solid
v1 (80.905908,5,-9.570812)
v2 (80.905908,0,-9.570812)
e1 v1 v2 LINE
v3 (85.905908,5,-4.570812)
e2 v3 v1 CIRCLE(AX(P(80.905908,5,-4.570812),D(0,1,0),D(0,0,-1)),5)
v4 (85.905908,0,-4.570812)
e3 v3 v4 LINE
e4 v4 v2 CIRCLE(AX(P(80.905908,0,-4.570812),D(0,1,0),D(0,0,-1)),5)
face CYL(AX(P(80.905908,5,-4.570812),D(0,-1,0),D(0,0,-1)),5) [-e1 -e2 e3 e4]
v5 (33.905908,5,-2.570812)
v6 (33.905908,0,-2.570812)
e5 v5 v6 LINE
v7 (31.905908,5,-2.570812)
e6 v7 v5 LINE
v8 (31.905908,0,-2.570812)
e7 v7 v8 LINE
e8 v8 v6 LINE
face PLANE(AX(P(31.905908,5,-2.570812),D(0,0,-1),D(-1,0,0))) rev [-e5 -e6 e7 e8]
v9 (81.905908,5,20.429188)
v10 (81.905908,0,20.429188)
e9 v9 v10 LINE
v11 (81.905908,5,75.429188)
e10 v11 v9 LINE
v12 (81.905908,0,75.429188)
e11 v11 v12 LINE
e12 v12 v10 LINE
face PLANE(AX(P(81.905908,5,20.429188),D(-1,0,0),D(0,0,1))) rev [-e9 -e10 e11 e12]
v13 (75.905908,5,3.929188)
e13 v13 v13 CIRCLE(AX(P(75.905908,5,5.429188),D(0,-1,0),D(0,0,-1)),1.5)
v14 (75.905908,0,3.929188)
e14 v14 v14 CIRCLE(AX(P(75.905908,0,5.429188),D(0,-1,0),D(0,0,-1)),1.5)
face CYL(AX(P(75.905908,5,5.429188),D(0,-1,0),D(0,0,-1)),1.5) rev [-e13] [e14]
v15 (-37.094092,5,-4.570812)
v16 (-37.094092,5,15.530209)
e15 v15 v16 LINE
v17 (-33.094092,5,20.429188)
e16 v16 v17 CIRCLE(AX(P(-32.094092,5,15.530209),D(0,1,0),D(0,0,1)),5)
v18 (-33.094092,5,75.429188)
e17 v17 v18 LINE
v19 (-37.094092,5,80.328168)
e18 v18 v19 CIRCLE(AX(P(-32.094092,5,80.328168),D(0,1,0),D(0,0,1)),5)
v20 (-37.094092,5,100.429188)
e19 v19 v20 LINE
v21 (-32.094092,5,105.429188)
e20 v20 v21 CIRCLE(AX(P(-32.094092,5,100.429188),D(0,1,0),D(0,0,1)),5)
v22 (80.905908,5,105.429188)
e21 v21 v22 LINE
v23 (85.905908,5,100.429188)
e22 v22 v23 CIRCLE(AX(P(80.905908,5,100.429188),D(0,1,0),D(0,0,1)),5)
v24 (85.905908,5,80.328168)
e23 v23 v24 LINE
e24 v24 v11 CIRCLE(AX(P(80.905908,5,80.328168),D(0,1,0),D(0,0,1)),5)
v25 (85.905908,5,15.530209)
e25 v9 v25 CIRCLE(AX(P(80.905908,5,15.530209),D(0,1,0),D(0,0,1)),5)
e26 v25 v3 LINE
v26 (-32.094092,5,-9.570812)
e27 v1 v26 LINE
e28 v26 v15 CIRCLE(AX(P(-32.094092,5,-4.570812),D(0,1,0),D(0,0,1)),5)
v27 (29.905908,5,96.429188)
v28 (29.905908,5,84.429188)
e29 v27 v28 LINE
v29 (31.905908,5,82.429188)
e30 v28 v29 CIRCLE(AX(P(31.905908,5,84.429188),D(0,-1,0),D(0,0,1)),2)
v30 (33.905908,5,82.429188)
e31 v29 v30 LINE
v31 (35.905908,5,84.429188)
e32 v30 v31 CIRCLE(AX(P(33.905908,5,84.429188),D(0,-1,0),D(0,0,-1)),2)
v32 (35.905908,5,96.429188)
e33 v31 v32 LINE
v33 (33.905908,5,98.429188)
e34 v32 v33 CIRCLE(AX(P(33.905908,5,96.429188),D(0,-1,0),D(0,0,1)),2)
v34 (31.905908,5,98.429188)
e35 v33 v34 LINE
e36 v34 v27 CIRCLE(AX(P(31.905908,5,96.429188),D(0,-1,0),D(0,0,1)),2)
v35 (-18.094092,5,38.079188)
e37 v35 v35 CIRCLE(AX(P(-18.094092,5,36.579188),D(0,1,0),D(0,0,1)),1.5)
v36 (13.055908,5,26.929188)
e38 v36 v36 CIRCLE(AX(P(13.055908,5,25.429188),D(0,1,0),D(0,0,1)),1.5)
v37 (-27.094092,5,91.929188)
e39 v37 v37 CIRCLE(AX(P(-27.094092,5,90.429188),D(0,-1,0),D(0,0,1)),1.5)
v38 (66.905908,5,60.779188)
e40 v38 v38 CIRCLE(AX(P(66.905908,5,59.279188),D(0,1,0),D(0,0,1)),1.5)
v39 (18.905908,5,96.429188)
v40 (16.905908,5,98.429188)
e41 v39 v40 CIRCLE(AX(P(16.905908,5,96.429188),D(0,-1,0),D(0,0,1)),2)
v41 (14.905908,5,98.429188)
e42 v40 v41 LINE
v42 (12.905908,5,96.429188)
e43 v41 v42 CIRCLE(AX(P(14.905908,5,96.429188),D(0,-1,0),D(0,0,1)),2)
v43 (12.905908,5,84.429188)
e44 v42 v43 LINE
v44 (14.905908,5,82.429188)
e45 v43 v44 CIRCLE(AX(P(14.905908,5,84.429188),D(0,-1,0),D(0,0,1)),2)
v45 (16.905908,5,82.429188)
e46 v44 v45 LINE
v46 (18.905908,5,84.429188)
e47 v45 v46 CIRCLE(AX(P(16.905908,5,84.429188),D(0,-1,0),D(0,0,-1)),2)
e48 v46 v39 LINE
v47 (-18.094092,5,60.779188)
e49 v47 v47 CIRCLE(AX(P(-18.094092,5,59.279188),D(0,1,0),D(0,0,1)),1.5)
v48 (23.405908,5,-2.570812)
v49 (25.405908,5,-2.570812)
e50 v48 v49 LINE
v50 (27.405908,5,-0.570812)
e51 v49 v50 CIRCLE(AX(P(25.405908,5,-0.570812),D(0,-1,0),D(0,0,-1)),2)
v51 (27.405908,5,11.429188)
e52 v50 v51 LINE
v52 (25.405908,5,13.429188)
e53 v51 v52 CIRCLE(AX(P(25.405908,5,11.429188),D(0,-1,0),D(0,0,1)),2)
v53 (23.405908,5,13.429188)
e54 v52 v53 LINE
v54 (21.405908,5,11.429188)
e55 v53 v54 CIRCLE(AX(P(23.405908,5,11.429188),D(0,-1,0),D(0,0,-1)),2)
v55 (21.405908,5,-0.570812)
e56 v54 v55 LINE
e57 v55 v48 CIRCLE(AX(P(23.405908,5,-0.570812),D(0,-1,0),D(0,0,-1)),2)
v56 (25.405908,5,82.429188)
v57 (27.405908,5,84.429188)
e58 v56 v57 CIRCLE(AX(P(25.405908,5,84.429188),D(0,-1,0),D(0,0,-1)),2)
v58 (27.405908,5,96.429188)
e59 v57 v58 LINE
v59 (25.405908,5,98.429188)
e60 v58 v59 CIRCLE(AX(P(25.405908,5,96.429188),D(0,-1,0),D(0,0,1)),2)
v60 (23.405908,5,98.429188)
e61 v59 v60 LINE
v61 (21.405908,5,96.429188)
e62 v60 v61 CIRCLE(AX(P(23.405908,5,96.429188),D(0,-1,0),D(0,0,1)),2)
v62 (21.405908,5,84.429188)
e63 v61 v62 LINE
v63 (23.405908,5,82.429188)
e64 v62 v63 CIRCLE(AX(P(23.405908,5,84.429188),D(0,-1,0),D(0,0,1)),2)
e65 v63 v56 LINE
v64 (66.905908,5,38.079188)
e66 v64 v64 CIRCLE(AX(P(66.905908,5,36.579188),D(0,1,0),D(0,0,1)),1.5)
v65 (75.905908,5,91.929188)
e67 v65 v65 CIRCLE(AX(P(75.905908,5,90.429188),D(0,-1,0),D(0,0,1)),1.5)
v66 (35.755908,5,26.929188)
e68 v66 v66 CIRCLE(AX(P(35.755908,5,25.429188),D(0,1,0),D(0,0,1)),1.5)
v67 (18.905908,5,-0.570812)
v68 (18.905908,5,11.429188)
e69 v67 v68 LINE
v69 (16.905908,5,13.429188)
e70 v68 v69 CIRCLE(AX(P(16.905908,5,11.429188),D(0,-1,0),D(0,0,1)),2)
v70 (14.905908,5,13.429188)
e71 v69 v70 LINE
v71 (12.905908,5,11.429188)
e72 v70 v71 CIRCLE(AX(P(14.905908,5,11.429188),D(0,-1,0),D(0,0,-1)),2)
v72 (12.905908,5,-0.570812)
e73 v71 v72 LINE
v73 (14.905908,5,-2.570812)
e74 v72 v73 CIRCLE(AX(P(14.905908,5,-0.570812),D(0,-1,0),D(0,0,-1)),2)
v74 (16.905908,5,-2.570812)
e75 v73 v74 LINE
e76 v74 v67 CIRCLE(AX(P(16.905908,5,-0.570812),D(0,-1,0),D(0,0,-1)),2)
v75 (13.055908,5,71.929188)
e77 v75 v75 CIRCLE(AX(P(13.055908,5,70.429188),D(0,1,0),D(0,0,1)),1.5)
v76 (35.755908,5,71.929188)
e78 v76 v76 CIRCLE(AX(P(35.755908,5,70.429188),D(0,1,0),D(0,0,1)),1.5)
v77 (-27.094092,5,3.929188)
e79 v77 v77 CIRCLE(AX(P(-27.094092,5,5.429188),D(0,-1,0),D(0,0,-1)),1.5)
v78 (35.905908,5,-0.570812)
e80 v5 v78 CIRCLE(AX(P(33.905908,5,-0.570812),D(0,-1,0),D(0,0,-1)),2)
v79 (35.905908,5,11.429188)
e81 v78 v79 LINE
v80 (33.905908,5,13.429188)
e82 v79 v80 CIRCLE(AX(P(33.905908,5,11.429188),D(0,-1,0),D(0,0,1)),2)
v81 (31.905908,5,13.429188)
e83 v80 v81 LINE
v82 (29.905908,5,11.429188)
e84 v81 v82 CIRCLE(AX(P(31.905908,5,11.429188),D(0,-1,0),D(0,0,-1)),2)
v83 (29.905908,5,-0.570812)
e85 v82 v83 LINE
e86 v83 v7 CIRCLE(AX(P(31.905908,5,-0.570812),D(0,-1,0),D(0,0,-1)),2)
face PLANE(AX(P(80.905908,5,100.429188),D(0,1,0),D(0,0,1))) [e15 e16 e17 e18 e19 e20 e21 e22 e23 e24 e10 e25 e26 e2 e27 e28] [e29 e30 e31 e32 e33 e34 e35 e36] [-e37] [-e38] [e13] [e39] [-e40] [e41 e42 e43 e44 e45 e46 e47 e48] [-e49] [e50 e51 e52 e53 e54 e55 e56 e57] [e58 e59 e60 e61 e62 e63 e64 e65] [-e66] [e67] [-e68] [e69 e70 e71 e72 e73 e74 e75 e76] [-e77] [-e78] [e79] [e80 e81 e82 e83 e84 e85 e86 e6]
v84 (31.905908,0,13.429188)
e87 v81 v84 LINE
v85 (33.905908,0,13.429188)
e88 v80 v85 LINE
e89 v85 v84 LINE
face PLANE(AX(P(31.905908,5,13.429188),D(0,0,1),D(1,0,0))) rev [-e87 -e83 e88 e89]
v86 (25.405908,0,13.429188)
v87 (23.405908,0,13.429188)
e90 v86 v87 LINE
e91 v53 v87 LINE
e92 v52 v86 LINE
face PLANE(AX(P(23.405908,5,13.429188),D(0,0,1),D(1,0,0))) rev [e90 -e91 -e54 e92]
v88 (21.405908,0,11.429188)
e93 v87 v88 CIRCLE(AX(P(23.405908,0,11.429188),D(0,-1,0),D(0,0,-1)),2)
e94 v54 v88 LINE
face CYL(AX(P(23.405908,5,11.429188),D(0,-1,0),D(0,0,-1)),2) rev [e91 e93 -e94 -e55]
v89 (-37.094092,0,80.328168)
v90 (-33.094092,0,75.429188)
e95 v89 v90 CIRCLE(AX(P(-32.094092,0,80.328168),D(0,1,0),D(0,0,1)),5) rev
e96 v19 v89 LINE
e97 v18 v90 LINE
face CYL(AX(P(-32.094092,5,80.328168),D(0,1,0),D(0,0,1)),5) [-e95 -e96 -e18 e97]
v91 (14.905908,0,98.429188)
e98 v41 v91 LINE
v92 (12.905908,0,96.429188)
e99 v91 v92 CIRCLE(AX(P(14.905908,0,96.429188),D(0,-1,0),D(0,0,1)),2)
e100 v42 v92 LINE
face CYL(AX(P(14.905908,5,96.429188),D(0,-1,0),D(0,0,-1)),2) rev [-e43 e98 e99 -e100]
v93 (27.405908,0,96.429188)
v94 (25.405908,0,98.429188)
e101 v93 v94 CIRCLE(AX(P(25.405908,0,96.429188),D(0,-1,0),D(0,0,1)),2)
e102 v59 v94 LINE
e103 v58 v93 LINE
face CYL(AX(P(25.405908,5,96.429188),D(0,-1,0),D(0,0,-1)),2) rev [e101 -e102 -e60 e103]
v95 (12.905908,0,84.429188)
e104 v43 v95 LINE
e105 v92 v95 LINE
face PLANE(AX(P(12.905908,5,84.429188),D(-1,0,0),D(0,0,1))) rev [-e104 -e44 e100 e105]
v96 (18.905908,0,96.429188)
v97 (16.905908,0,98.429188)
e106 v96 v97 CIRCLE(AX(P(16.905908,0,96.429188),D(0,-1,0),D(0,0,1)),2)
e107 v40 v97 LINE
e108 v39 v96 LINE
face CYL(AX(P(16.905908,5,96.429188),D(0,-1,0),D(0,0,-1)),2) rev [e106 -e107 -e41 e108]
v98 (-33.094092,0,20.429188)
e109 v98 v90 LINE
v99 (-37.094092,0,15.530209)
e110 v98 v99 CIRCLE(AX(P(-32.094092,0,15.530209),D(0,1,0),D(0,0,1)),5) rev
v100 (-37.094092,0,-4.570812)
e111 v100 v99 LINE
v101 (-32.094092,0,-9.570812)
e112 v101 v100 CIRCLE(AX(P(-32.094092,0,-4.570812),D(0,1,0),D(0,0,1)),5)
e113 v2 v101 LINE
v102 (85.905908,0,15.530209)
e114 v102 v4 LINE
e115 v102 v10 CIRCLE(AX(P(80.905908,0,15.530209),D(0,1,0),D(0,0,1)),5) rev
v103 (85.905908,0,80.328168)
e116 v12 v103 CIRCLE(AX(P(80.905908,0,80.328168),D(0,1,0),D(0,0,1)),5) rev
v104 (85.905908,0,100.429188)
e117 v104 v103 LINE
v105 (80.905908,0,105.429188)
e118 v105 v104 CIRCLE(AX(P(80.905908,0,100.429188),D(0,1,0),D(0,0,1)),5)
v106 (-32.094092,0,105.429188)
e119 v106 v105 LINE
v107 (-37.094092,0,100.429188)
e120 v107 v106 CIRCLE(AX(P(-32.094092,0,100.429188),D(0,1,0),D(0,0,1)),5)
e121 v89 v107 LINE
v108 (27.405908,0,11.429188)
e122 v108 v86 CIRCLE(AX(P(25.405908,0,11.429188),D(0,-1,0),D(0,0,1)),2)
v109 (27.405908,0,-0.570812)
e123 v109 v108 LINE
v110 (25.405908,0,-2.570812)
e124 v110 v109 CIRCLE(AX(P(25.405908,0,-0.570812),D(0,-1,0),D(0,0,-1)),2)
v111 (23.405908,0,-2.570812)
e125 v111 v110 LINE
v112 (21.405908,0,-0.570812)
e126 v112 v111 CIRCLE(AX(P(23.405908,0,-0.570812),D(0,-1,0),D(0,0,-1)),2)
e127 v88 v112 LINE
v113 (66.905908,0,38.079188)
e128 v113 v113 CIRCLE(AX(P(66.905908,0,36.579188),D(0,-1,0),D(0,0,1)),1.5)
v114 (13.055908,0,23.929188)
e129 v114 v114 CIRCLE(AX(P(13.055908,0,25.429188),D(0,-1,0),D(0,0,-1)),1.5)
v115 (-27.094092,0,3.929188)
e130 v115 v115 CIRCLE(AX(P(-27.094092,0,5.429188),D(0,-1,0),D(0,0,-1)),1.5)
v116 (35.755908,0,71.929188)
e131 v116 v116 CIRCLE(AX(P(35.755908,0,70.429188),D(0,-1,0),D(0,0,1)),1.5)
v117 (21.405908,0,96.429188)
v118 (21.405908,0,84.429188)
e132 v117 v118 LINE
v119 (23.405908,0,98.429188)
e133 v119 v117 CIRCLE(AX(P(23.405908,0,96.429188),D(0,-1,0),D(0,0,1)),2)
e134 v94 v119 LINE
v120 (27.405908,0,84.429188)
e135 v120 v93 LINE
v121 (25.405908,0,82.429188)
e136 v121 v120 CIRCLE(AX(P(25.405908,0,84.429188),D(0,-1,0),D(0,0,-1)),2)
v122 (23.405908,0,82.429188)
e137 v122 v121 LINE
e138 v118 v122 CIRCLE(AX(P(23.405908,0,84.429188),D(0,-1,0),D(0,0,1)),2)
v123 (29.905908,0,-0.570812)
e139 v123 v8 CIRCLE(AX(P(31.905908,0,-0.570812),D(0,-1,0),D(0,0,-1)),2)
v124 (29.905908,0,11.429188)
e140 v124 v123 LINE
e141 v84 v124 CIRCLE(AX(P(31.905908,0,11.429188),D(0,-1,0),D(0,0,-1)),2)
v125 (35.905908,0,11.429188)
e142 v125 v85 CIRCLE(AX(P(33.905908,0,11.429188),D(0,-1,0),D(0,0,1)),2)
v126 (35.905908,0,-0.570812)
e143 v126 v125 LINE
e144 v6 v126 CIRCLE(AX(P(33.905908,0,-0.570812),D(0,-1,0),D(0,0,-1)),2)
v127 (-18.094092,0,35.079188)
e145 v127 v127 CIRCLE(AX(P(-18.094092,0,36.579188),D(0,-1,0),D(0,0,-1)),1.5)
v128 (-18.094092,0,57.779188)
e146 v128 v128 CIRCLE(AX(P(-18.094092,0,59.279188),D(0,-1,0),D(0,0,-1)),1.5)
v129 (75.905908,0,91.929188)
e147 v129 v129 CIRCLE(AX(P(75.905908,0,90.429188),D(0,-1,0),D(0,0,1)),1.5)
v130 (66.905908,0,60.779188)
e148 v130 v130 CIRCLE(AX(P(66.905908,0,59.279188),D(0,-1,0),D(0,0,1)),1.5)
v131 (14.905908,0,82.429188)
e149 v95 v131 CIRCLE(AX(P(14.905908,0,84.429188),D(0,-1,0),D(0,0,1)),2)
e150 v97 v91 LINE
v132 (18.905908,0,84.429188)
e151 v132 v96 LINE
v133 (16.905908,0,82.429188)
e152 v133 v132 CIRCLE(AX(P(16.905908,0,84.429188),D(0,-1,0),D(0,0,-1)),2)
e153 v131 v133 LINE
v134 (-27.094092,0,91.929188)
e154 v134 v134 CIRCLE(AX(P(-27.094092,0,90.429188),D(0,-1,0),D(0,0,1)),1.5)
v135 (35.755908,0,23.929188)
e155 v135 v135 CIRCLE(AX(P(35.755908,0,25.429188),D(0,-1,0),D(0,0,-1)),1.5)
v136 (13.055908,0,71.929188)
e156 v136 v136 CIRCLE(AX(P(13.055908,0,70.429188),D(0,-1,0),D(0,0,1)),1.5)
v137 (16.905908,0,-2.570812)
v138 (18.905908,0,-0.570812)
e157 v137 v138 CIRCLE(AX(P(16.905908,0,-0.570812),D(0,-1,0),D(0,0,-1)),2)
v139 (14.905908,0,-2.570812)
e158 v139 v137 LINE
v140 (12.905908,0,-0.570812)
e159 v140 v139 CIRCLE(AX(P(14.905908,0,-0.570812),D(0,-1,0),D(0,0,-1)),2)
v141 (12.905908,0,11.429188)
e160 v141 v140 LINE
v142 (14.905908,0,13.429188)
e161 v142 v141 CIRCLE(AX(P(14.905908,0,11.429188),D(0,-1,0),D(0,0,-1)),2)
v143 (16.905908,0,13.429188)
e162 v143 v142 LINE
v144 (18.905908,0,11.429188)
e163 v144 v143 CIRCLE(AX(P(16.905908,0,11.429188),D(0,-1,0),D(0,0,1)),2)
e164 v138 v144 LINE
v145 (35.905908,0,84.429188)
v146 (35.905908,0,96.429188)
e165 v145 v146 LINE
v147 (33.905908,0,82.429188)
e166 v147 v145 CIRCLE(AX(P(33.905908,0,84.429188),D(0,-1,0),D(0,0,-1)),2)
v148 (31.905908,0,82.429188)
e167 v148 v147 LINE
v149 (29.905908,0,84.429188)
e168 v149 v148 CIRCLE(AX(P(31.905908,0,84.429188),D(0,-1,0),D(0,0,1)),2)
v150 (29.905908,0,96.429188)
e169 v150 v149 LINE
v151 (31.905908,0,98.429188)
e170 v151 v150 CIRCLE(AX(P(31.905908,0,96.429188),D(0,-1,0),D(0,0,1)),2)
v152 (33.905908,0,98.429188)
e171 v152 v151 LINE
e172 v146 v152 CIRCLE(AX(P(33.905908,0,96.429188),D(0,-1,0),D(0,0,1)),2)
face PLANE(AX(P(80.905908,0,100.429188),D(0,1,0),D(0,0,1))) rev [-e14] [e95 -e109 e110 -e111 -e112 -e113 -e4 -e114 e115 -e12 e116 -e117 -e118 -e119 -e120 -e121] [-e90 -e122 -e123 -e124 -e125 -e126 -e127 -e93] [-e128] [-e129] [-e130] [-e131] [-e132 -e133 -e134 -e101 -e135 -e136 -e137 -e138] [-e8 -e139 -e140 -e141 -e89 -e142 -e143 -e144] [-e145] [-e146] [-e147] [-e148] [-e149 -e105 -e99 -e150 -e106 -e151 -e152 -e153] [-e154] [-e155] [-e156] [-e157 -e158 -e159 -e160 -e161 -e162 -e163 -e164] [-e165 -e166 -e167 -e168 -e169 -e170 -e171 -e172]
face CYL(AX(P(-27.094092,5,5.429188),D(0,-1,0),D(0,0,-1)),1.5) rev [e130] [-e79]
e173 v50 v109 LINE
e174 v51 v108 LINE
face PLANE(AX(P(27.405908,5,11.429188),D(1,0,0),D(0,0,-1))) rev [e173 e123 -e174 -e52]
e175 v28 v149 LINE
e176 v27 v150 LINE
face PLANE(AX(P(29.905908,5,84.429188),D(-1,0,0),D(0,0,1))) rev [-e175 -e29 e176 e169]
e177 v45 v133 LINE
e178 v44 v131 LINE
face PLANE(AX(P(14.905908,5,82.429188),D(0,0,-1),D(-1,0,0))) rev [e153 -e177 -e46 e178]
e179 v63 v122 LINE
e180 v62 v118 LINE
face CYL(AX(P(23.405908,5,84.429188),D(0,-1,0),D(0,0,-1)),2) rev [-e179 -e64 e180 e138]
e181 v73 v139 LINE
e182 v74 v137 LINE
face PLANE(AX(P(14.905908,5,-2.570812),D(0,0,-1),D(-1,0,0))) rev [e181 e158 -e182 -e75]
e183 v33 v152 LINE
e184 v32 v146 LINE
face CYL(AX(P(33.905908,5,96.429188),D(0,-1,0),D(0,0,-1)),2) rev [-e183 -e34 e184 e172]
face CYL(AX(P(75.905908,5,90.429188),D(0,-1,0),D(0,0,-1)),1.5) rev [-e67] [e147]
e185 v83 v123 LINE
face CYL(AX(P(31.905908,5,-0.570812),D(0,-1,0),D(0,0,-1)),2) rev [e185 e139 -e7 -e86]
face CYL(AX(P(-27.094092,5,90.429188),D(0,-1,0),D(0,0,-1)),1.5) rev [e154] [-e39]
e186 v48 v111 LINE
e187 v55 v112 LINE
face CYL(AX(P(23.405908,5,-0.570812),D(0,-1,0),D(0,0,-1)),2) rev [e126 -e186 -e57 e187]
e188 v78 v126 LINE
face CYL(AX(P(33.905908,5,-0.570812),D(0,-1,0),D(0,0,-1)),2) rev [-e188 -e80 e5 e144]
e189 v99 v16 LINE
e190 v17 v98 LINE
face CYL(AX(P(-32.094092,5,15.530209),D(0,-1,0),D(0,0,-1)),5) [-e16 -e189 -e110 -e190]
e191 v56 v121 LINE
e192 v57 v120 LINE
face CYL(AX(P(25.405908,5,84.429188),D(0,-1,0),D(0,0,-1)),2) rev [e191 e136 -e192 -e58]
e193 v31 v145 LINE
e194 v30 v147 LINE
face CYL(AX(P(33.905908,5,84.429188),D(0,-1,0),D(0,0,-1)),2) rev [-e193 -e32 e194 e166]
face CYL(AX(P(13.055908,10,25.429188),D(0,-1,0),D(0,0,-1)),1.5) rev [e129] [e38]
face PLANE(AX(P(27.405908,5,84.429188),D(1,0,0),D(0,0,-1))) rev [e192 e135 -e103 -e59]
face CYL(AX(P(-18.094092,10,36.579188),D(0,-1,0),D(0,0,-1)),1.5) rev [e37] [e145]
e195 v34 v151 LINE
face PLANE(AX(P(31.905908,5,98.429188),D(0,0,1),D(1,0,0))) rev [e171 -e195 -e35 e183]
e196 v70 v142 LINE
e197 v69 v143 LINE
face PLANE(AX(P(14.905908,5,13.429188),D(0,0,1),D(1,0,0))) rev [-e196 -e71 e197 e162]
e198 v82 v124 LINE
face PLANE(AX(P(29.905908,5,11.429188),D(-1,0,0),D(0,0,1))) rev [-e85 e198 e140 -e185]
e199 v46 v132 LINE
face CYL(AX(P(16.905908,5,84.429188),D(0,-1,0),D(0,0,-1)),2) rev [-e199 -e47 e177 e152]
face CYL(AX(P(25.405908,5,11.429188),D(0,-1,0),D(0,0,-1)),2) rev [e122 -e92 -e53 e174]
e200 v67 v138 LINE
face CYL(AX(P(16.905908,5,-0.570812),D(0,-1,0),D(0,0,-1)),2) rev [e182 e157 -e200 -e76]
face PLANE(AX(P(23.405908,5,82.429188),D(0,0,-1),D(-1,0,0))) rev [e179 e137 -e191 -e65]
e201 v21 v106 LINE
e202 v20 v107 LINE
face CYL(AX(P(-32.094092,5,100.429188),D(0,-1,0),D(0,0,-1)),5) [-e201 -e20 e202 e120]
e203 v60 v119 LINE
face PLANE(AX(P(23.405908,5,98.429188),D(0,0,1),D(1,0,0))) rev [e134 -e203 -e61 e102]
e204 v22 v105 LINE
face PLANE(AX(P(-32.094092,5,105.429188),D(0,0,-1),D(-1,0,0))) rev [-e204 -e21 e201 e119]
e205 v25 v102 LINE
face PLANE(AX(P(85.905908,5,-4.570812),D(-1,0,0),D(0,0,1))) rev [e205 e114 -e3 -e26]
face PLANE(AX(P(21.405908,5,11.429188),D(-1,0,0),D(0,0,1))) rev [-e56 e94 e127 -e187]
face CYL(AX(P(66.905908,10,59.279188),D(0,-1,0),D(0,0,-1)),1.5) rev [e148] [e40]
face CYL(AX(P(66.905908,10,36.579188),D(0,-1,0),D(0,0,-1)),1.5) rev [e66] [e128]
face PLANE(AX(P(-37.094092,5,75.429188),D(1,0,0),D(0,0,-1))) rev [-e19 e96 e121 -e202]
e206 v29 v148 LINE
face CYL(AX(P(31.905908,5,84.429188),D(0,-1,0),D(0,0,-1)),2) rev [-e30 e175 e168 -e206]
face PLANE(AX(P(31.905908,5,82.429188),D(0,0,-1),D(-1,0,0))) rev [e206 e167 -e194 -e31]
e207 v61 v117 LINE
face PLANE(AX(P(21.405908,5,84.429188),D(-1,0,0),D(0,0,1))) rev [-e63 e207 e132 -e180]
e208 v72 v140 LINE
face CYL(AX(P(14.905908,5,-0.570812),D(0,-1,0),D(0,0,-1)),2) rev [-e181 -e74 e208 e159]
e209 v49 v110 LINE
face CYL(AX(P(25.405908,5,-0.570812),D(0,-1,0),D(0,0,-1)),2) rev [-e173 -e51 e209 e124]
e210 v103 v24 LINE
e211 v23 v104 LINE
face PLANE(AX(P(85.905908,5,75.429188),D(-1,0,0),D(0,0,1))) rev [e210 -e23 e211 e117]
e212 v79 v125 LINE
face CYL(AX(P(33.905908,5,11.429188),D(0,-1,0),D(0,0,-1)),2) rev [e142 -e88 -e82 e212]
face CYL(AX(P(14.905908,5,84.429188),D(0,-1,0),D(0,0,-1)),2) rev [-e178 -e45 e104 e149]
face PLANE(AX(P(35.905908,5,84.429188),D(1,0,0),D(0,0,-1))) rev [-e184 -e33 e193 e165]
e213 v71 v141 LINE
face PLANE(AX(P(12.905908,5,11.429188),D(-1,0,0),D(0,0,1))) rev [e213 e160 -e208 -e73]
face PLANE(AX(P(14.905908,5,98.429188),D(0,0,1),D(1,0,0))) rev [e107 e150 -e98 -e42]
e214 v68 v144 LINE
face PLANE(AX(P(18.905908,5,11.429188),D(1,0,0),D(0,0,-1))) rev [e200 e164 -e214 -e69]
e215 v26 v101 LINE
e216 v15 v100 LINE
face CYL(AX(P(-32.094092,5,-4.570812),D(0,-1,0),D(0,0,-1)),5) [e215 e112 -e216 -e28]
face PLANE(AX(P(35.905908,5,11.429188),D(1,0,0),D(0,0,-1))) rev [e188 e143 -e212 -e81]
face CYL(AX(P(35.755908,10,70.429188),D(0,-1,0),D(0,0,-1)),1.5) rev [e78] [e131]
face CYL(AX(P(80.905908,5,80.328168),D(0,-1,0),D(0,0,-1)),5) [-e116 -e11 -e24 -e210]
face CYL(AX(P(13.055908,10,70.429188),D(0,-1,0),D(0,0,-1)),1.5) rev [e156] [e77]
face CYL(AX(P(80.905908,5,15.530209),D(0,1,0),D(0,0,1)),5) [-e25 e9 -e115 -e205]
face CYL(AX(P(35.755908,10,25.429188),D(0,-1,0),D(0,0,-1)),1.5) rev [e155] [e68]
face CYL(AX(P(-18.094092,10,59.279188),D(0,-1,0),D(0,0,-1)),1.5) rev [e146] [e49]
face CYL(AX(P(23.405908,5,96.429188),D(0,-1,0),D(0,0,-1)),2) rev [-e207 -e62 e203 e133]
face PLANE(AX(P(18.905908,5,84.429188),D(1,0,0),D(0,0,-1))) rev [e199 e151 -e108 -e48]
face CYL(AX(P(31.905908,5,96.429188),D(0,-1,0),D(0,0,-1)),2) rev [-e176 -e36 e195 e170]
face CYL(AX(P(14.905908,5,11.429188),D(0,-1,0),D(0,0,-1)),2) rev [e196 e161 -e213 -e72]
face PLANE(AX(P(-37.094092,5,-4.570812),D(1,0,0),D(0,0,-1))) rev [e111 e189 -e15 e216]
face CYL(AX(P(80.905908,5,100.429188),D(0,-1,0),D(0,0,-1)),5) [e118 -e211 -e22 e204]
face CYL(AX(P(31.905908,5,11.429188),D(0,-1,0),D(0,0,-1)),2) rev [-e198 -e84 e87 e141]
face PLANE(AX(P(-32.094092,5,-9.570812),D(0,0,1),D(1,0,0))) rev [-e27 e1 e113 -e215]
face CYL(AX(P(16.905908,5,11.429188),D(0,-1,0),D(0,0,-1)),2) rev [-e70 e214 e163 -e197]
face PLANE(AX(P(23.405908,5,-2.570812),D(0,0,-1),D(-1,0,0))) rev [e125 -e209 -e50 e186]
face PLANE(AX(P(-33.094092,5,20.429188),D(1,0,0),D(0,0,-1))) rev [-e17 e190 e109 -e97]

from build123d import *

# Parameters (mm, degrees)
RESSALTO_EXTRUS_O1_DEPTH = 5
FILETE1_R                = 5
ESBO_O3_R                = 1.5
CORTE_EXTRUS_O1_DEPTH    = 5
ESBO_O5_R                = 1.5
CORTE_EXTRUS_O2_DEPTH    = 10


with BuildPart() as part:
    # Esboço1 → Ressalto-extrusão1 (new body)
    with BuildSketch(Plane(origin=(0, 0, 0), x_dir=(1, 0, 0), z_dir=(0, 1, 0))):
        with BuildLine():
            Line((81.90590785, -20.429188404), (85.90590785, -20.429188404))
            Line((85.90590785, -20.429188404), (85.90590785, 4.570811596))
            ThreePointArc((85.90590785, 4.570811596), (84.441441756, 8.106345502), (80.90590785, 9.570811596))
            Line((80.90590785, 9.570811596), (-32.09409215, 9.570811596))
            ThreePointArc((-32.09409215, 9.570811596), (-35.629626056, 8.106345502), (-37.09409215, 4.570811596))
            Line((-37.09409215, 4.570811596), (-37.09409215, -20.429188404))
            Line((-37.09409215, -20.429188404), (-33.09409215, -20.429188404))
            Line((-33.09409215, -20.429188404), (-33.09409215, -75.429188404))
            Line((-33.09409215, -75.429188404), (-37.09409215, -75.429188404))
            Line((-37.09409215, -75.429188404), (-37.09409215, -100.429188404))
            ThreePointArc((-37.09409215, -100.429188404), (-35.629626056, -103.96472231), (-32.09409215, -105.429188404))
            Line((-32.09409215, -105.429188404), (80.90590785, -105.429188404))
            ThreePointArc((80.90590785, -105.429188404), (84.441441756, -103.96472231), (85.90590785, -100.429188404))
            Line((85.90590785, -100.429188404), (85.90590785, -75.429188404))
            Line((85.90590785, -75.429188404), (81.90590785, -75.429188404))
            Line((81.90590785, -75.429188404), (81.90590785, -20.429188404))
        make_face()
    extrude(amount=RESSALTO_EXTRUS_O1_DEPTH)

    # Filete1
    # the kernel refuses this fillet: 5 mm, written as the material it takes off along each edge
    with BuildSketch(Plane(origin=(-37.09409215, -12.247448714, 75.429188404), x_dir=(1.0, 0, 1.5738521597081158e-12), z_dir=(0, 1, 0)), Plane(origin=(85.90590785, -12.247448714, 20.429188404), x_dir=(-1.0, 0, -1.5685230891899197e-12), z_dir=(0, 1, 0))) as filete1_piece_1:
        with BuildLine():
            CenterArc((5, -4.898979486), FILETE1_R, 101.536959033, 78.463040967)
            Line((0, -4.898979486), (-0.1, -4.898979486))
            Line((-0.1, -4.898979486), (-0.1, 0))
            Line((-0.1, 0), (0, 0.1))
            ThreePointArc((0, 0.1), (2, 0.1), (3.98, 0.09797959))
            Line((3.98, 0.09797959), (4, 0))
        make_face()
    extrude(amount=29.494897428, mode=Mode.SUBTRACT)
    with BuildSketch(Plane(origin=(-37.09409215, -12.247448714, 20.429188404), x_dir=(0, 0, -1), z_dir=(0, 1, 0)), Plane(origin=(85.90590785, -12.247448714, 75.429188404), x_dir=(0, 0, 1), z_dir=(0, 1, 0))) as filete1_piece_2:
        with BuildLine():
            CenterArc((4.898979486, -5), FILETE1_R, 90, 78.463040967)
            Line((0, -4), (-0.09797959, -3.98))
            ThreePointArc((-0.09797959, -3.98), (-0.1, -2), (-0.1, 0))
            Line((-0.1, 0), (0, 0.1))
            Line((0, 0.1), (4.898979486, 0.1))
            Line((4.898979486, 0.1), (4.898979486, 0))
        make_face()
    extrude(amount=29.494897428, mode=Mode.SUBTRACT)

    # Esboço3 → Corte-extrusão1 (cut)
    with BuildSketch(Plane.XZ):
        with Locations(Location((-27.09409215, 5.429188404, 0), (0, 0, 270))):
            Circle(ESBO_O3_R)
        with Locations(Location((75.90590785, 5.429188404, 0), (0, 0, 270))):
            Circle(ESBO_O3_R)
        with Locations(Location((75.90590785, 90.429188404, 0), (0, 0, 90))):
            Circle(ESBO_O3_R)
        with Locations(Location((-27.09409215, 90.429188404, 0), (0, 0, 90))):
            Circle(ESBO_O3_R)
        with BuildLine():
            Line((35.90590785, 84.429188404), (35.90590785, 96.429188404))
            ThreePointArc((35.90590785, 96.429188404), (35.320121412, 97.843401966), (33.90590785, 98.429188404))
            Line((33.90590785, 98.429188404), (31.90590785, 98.429188404))
            ThreePointArc((31.90590785, 98.429188404), (30.491694287, 97.843401966), (29.90590785, 96.429188404))
            Line((29.90590785, 96.429188404), (29.90590785, 84.429188404))
            ThreePointArc((29.90590785, 84.429188404), (30.491694287, 83.014974841), (31.90590785, 82.429188404))
            Line((31.90590785, 82.429188404), (33.90590785, 82.429188404))
            ThreePointArc((33.90590785, 82.429188404), (35.320121412, 83.014974841), (35.90590785, 84.429188404))
        make_face()
        with BuildLine():
            Line((14.90590785, 13.429188404), (16.90590785, 13.429188404))
            ThreePointArc((16.90590785, 13.429188404), (18.320121412, 12.843401966), (18.90590785, 11.429188404))
            Line((18.90590785, 11.429188404), (18.90590785, -0.570811596))
            ThreePointArc((18.90590785, -0.570811596), (18.320121412, -1.985025159), (16.90590785, -2.570811596))
            Line((16.90590785, -2.570811596), (14.90590785, -2.570811596))
            ThreePointArc((14.90590785, -2.570811596), (13.491694287, -1.985025159), (12.90590785, -0.570811596))
            Line((12.90590785, -0.570811596), (12.90590785, 11.429188404))
            ThreePointArc((12.90590785, 11.429188404), (13.491694287, 12.843401966), (14.90590785, 13.429188404))
        make_face()
        with BuildLine():
            Line((23.40590785, 13.429188404), (25.40590785, 13.429188404))
            ThreePointArc((25.40590785, 13.429188404), (26.820121412, 12.843401966), (27.40590785, 11.429188404))
            Line((27.40590785, 11.429188404), (27.40590785, -0.570811596))
            ThreePointArc((27.40590785, -0.570811596), (26.820121412, -1.985025159), (25.40590785, -2.570811596))
            Line((25.40590785, -2.570811596), (23.40590785, -2.570811596))
            ThreePointArc((23.40590785, -2.570811596), (21.991694287, -1.985025159), (21.40590785, -0.570811596))
            Line((21.40590785, -0.570811596), (21.40590785, 11.429188404))
            ThreePointArc((21.40590785, 11.429188404), (21.991694287, 12.843401966), (23.40590785, 13.429188404))
        make_face()
        with BuildLine():
            Line((31.90590785, 13.429188404), (33.90590785, 13.429188404))
            ThreePointArc((33.90590785, 13.429188404), (35.320121412, 12.843401966), (35.90590785, 11.429188404))
            Line((35.90590785, 11.429188404), (35.90590785, -0.570811596))
            ThreePointArc((35.90590785, -0.570811596), (35.320121412, -1.985025159), (33.90590785, -2.570811596))
            Line((33.90590785, -2.570811596), (31.90590785, -2.570811596))
            ThreePointArc((31.90590785, -2.570811596), (30.491694287, -1.985025159), (29.90590785, -0.570811596))
            Line((29.90590785, -0.570811596), (29.90590785, 11.429188404))
            ThreePointArc((29.90590785, 11.429188404), (30.491694287, 12.843401966), (31.90590785, 13.429188404))
        make_face()
        with BuildLine():
            Line((27.40590785, 84.429188404), (27.40590785, 96.429188404))
            ThreePointArc((27.40590785, 96.429188404), (26.820121412, 97.843401966), (25.40590785, 98.429188404))
            Line((25.40590785, 98.429188404), (23.40590785, 98.429188404))
            ThreePointArc((23.40590785, 98.429188404), (21.991694287, 97.843401966), (21.40590785, 96.429188404))
            Line((21.40590785, 96.429188404), (21.40590785, 84.429188404))
            ThreePointArc((21.40590785, 84.429188404), (21.991694287, 83.014974841), (23.40590785, 82.429188404))
            Line((23.40590785, 82.429188404), (25.40590785, 82.429188404))
            ThreePointArc((25.40590785, 82.429188404), (26.820121412, 83.014974841), (27.40590785, 84.429188404))
        make_face()
        with BuildLine():
            Line((18.90590785, 84.429188404), (18.90590785, 96.429188404))
            ThreePointArc((18.90590785, 96.429188404), (18.320121412, 97.843401966), (16.90590785, 98.429188404))
            Line((16.90590785, 98.429188404), (14.90590785, 98.429188404))
            ThreePointArc((14.90590785, 98.429188404), (13.491694287, 97.843401966), (12.90590785, 96.429188404))
            Line((12.90590785, 96.429188404), (12.90590785, 84.429188404))
            ThreePointArc((12.90590785, 84.429188404), (13.491694287, 83.014974841), (14.90590785, 82.429188404))
            Line((14.90590785, 82.429188404), (16.90590785, 82.429188404))
            ThreePointArc((16.90590785, 82.429188404), (18.320121412, 83.014974841), (18.90590785, 84.429188404))
        make_face()
    extrude(amount=-CORTE_EXTRUS_O1_DEPTH, mode=Mode.SUBTRACT)

    # Esboço5 → Corte-extrusão2 (cut)
    with BuildSketch(Plane.XZ):
        with Locations(Location((13.05590785, 25.429188404, 0), (0, 0, 270))):
            Circle(ESBO_O5_R)
        with Locations(Location((35.75590785, 25.429188404, 0), (0, 0, 270))):
            Circle(ESBO_O5_R)
        with Locations(Location((-18.09409215, 59.279188404, 0), (0, 0, 270))):
            Circle(ESBO_O5_R)
        with Locations(Location((-18.09409215, 36.579188404, 0), (0, 0, 270))):
            Circle(ESBO_O5_R)
        with Locations(Location((13.05590785, 70.429188404, 0), (0, 0, 90))):
            Circle(ESBO_O5_R)
        with Locations(Location((35.75590785, 70.429188404, 0), (0, 0, 90))):
            Circle(ESBO_O5_R)
        with Locations(Location((66.90590785, 36.579188404, 0), (0, 0, 90))):
            Circle(ESBO_O5_R)
        with Locations(Location((66.90590785, 59.279188404, 0), (0, 0, 90))):
            Circle(ESBO_O5_R)
    extrude(amount=-CORTE_EXTRUS_O2_DEPTH, mode=Mode.SUBTRACT)


solid = part.part
